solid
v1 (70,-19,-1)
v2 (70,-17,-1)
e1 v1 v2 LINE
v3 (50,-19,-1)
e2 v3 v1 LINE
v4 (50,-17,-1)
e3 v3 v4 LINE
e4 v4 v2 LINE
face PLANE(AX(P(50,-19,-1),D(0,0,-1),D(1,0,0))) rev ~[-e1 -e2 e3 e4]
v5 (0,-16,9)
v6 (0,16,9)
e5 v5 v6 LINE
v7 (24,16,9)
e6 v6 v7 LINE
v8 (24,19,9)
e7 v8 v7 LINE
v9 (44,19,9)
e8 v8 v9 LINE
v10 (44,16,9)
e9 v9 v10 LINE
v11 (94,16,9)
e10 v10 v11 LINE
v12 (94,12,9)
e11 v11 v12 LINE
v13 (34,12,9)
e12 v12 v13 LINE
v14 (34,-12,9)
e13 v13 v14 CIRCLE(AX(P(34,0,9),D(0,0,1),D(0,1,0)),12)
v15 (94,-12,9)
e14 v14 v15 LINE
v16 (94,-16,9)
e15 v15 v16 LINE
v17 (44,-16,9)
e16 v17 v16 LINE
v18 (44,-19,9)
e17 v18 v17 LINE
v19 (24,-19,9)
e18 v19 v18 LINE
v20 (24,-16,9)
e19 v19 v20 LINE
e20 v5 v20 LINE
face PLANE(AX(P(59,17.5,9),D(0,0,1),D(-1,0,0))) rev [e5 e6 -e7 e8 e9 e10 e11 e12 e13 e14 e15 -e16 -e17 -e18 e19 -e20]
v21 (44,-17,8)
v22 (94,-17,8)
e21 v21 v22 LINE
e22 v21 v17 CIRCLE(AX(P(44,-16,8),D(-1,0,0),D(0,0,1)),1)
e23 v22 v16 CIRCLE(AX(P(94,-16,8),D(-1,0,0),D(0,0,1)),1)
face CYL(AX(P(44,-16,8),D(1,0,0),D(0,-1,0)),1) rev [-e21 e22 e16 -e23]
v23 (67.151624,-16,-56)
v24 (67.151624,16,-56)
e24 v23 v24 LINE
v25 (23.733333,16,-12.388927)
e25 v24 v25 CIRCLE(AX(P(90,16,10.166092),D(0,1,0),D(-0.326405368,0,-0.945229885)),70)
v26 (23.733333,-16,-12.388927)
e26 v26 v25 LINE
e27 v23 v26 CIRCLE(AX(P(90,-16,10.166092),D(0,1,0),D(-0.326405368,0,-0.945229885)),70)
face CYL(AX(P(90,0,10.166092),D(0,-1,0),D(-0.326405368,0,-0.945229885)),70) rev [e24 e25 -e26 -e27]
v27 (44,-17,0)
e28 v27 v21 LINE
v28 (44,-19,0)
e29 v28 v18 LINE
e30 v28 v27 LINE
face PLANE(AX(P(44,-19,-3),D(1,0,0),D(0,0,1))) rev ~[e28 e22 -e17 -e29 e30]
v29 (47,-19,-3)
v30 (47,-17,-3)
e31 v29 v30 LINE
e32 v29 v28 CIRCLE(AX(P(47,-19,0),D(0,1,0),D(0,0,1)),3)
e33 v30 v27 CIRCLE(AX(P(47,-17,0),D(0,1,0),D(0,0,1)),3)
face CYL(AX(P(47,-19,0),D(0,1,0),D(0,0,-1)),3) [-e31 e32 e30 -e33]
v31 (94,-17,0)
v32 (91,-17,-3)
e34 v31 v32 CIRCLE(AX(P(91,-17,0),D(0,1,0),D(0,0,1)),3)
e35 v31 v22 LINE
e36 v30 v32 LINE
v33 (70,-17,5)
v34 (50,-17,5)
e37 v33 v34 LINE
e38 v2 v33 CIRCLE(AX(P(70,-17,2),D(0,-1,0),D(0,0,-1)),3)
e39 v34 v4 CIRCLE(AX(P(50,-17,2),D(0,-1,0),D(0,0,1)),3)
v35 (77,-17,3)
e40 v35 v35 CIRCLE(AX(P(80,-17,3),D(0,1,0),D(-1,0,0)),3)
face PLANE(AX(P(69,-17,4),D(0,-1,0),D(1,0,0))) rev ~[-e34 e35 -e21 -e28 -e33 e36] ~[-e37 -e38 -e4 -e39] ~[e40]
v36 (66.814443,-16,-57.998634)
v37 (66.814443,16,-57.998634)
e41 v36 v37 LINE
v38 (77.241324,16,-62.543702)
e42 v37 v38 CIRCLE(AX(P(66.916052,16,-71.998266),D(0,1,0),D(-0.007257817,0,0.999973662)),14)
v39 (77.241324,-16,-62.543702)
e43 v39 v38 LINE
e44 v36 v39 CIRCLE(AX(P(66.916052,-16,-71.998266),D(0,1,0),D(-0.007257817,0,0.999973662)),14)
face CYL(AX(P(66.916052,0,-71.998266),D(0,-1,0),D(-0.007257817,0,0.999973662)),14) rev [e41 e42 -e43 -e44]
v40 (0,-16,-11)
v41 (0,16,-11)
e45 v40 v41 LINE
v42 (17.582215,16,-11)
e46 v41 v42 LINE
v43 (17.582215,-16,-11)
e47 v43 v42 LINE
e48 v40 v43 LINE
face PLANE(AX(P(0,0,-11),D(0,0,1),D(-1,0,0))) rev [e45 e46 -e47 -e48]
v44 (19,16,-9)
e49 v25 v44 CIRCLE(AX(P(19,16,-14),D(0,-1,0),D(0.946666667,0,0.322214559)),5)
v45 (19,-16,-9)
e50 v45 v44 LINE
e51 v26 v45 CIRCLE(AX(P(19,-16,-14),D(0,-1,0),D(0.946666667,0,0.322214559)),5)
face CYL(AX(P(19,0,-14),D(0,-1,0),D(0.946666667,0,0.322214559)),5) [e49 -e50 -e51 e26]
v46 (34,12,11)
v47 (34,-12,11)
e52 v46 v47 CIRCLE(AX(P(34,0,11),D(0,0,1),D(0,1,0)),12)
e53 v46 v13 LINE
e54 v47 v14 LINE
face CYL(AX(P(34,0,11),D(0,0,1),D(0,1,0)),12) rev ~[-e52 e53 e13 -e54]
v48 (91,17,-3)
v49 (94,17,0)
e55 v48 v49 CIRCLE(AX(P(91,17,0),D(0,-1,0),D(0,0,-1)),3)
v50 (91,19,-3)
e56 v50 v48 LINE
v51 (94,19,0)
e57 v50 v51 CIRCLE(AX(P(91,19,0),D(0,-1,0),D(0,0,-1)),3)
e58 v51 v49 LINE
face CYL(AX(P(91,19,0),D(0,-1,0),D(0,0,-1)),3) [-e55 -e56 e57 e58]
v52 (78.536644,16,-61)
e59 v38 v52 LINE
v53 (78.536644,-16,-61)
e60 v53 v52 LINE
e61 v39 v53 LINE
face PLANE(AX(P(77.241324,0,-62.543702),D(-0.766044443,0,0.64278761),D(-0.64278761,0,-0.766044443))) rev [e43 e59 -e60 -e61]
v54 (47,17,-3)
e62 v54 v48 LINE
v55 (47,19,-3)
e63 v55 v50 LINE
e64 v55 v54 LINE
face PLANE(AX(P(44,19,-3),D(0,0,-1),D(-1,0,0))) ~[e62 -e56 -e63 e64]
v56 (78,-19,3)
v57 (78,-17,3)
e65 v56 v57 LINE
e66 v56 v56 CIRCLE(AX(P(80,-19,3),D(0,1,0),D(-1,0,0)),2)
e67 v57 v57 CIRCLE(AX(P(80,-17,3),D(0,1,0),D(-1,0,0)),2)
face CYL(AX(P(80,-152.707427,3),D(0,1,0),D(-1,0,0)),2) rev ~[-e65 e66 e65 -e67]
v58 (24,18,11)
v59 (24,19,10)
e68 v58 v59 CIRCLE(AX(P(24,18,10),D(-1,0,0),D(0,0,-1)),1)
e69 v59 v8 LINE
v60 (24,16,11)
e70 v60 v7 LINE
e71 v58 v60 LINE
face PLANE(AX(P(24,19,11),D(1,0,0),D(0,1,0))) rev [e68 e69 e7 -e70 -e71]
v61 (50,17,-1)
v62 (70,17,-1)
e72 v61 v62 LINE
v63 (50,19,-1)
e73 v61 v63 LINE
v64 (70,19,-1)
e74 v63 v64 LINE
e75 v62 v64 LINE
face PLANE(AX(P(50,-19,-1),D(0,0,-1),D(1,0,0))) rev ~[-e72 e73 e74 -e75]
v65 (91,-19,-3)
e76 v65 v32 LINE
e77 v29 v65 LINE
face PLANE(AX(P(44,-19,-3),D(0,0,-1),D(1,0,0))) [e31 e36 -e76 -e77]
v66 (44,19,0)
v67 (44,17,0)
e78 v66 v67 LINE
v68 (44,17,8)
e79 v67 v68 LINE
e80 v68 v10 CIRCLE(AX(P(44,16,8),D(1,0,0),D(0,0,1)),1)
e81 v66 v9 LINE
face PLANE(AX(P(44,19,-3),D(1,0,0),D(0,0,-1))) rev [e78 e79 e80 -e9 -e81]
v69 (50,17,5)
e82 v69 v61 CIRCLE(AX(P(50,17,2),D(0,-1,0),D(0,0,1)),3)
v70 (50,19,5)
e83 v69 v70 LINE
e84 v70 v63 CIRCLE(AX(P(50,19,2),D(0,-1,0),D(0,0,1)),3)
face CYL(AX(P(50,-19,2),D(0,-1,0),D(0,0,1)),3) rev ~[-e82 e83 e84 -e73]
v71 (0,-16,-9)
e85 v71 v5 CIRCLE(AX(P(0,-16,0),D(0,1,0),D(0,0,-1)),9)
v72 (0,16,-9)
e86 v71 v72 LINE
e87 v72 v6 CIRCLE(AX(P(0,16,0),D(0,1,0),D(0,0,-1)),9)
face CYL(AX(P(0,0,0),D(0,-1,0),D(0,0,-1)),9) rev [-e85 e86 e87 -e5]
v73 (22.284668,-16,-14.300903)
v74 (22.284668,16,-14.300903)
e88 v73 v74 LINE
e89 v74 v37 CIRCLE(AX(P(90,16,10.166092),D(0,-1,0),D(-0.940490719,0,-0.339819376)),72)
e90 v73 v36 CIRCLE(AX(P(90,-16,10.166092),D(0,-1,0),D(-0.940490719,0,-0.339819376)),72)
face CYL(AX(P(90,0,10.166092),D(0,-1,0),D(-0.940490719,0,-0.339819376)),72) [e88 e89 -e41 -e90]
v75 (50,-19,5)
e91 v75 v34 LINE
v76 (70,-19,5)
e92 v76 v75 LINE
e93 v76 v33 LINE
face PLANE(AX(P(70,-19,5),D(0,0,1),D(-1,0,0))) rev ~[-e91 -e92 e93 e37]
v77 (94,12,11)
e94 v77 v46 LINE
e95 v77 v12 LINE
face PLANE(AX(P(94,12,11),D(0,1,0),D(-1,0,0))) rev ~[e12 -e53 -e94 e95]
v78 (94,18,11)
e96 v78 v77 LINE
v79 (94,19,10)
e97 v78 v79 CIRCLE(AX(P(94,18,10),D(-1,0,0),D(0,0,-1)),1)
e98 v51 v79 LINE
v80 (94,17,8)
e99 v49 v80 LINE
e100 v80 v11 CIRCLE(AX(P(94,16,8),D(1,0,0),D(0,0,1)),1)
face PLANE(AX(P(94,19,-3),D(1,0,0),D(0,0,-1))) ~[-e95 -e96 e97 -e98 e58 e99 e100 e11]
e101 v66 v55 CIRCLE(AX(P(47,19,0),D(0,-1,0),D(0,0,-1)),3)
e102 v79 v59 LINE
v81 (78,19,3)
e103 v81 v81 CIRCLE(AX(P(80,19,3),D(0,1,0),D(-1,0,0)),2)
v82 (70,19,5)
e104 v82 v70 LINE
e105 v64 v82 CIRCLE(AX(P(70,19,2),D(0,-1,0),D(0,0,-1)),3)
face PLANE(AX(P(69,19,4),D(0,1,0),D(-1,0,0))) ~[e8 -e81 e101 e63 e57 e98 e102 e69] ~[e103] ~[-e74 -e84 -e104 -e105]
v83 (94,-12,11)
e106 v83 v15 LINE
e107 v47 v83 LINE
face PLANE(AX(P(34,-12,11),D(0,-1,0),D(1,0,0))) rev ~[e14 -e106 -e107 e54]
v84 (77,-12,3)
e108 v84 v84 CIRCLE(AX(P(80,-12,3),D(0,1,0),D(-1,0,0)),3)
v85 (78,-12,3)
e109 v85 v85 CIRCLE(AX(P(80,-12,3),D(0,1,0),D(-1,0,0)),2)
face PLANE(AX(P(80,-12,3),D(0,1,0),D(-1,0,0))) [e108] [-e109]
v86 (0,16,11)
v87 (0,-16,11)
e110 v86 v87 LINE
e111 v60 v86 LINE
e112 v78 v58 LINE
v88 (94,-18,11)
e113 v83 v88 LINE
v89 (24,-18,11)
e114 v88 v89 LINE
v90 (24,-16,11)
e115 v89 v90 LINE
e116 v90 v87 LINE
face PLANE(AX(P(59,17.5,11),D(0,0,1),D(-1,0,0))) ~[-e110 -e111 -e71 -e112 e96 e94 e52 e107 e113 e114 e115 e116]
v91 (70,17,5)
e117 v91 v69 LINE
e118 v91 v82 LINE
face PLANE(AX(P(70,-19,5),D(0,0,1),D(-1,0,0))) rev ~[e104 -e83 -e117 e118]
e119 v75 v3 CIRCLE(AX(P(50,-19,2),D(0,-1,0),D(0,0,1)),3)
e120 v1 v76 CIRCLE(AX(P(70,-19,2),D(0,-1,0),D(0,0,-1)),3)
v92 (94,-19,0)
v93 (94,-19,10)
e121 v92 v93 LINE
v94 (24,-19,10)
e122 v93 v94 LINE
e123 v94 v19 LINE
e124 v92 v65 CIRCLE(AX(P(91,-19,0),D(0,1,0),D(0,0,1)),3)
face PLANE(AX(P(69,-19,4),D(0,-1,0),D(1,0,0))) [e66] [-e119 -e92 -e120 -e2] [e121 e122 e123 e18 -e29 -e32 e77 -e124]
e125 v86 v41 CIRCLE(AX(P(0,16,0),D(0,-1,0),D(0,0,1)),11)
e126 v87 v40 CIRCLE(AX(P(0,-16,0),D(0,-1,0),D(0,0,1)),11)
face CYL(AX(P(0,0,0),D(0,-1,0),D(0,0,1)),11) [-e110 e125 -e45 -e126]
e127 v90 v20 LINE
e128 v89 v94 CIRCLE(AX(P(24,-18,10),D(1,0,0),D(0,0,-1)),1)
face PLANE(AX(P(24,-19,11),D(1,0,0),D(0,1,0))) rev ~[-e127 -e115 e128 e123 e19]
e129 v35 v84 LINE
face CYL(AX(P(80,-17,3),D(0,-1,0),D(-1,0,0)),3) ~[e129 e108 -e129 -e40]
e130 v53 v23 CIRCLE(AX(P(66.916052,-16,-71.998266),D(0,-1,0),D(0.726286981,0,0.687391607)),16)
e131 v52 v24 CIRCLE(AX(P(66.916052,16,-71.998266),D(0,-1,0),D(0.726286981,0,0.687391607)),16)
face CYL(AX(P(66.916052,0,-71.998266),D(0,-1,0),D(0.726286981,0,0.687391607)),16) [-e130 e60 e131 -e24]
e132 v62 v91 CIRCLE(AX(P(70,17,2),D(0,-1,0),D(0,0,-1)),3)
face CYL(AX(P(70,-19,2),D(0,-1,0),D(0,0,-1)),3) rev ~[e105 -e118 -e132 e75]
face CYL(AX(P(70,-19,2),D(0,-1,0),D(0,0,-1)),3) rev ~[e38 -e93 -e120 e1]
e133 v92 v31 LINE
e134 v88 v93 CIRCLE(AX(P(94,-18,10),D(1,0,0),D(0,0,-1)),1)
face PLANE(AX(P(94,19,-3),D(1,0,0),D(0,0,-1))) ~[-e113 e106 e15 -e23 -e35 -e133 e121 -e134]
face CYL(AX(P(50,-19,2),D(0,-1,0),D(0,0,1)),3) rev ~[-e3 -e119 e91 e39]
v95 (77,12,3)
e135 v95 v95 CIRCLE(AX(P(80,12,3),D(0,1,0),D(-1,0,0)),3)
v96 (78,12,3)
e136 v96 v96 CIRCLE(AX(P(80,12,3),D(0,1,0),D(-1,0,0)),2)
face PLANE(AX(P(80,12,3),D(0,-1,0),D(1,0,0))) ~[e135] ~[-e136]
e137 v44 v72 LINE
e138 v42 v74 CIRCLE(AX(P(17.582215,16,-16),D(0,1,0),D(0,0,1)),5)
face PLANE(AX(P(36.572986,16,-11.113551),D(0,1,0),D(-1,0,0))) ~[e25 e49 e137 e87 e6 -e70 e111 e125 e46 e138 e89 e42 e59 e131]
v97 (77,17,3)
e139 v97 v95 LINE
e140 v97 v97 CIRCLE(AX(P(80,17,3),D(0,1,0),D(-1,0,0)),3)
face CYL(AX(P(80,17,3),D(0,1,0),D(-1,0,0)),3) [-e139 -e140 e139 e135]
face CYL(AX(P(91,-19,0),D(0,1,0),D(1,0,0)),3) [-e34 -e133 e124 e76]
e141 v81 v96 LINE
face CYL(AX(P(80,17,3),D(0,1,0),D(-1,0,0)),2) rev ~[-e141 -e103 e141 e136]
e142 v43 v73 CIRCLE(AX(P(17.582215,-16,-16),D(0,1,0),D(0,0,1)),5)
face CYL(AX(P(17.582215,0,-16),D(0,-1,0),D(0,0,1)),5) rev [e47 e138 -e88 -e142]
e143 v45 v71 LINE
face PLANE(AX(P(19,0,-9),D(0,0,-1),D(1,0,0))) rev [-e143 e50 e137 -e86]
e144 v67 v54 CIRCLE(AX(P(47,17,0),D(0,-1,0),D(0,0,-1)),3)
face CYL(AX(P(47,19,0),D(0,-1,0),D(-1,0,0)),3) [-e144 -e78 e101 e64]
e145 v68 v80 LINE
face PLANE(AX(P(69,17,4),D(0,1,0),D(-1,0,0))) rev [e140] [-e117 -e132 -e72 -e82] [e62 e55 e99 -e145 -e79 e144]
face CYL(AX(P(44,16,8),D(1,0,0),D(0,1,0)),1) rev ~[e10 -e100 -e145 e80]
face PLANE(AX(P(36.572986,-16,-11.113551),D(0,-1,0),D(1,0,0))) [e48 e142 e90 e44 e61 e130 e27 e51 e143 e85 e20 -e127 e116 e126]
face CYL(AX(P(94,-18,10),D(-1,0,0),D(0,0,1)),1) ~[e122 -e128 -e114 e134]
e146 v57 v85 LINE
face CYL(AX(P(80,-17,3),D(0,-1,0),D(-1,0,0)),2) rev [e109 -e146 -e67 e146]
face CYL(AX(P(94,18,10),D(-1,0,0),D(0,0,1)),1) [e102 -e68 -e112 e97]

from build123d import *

# Parameters (mm, degrees)
F1_DEPTH  = 16
F2_W      = 70
F2_H      = 3
F3_DEPTH  = 2
F4_W      = 50
F4_H      = 14
F5_DEPTH  = 2
F6_R      = 1
F9_DEPTH  = 2
F11_DEPTH = 38.001
F13_D     = 4
F14_R     = 3
F14_R_2   = 2
F15_DEPTH = 5
F16_R     = 3


# Not quite as in the source:
# - a pattern or mirror of a feature is missing from the dataset's text; its kind, count and spacing are read off the source's solid


with BuildPart() as f1:
    # F0 (on Front) → F1 (new body)
    with BuildSketch(Plane.XZ):
        with BuildLine():
            Line((94, 11), (0, 11))
            ThreePointArc((0, 11), (-11, 0), (0, -11))
            Line((0, -11), (17.5822146692, -11))
            ThreePointArc((17.5822146692, -11), (20.4548889983, -11.9075994576), (22.2846682622, -14.3009031203))
            ThreePointArc((22.2846682622, -14.3009031203), (39.5706846565, -41.223441559), (66.8144425174, -57.9986344457))
            ThreePointArc((66.8144425174, -57.9986344457), (72.5102657096, -59.1645299936), (77.2413235191, -62.5437024171))
            Line((77.2413235191, -62.5437024171), (78.536643648, -61))
            ThreePointArc((78.536643648, -61), (73.3497255449, -57.3487659198), (67.1516242057, -56))
            ThreePointArc((67.1516242057, -56), (40.3930033582, -39.2216179023), (23.7333333333, -12.3889272035))
            ThreePointArc((23.7333333333, -12.3889272035), (21.9107246536, -9.9345748081), (19, -9))
            Line((19, -9), (0, -9))
            ThreePointArc((0, -9), (-9, 0), (0, 9))
            Line((0, 9), (94, 9))
            Line((94, 9), (94, 11))
        make_face()
    extrude(amount=F1_DEPTH)

    # F2 (on face) → F3 (join)
    with BuildSketch(Plane.XY.offset(11)):
        with Locations((59, -17.5)):
            Rectangle(F2_W, F2_H)
    extrude(amount=-F3_DEPTH)

    # F4 (on face) → F5 (join)
    with BuildSketch(Plane.XZ.offset(19)):
        with Locations((69, 4)):
            Rectangle(F4_W, F4_H)
    extrude(amount=-F5_DEPTH)

    # F6
    f6_edges = [f1.edges().sort_by_distance(p)[0] for p in [
        (59, -19, 11),
        (69, -17, 9),
    ]]
    fillet(f6_edges, radius=F6_R)

    # F7: F1 across plane


with BuildPart() as f1_1:
    add(f1.part)
    add(f1.part.mirror(Plane.XZ))

    # F8 (on face) → F9 (cut)
    with BuildSketch(Plane.XY.offset(11)):
        with BuildLine():
            Line((94, 12), (34, 12))
            ThreePointArc((34, 12), (22, 0), (34, -12))
            Line((34, -12), (94, -12))
            Line((94, -12), (94, 12))
        make_face()
    extrude(amount=-F9_DEPTH, mode=Mode.SUBTRACT)

    # F10 (on face) → F11 (cut, through all)
    with BuildSketch(Plane.XZ.offset(19)):
        with BuildLine():
            ThreePointArc((50, 5), (47, 2), (50, -1))
            Line((50, -1), (70, -1))
            ThreePointArc((70, -1), (73, 2), (70, 5))
            Line((70, 5), (50, 5))
        make_face()
    extrude(amount=-F11_DEPTH, mode=Mode.SUBTRACT)

    # F13 (through all)
    with Locations(Plane.XZ.offset(19)):
        with Locations((80, 3)):
            Hole(F13_D / 2)

    # F14 (on face) → F15 (join)
    with BuildSketch(Plane(origin=(0, -17, 0), x_dir=(-1, 0, 0), z_dir=(0, 1, 0))):
        with Locations((-80, 3)):
            Circle(F14_R)
        with Locations((-80, 3)):
            Circle(F14_R_2, mode=Mode.SUBTRACT)
    f15 = extrude(amount=F15_DEPTH)

    # F15_copies: F15 across plane
    add(f15.mirror(Plane.ZX))

    # F16
    f16_edges = [f1_1.edges().sort_by_distance(p)[0] for p in [
        (44, -18, -3),
        (94, -18, -3),
        (44, 18, -3),
        (94, 18, -3),
    ]]
    fillet(f16_edges, radius=F16_R)


solid = f1_1.part
